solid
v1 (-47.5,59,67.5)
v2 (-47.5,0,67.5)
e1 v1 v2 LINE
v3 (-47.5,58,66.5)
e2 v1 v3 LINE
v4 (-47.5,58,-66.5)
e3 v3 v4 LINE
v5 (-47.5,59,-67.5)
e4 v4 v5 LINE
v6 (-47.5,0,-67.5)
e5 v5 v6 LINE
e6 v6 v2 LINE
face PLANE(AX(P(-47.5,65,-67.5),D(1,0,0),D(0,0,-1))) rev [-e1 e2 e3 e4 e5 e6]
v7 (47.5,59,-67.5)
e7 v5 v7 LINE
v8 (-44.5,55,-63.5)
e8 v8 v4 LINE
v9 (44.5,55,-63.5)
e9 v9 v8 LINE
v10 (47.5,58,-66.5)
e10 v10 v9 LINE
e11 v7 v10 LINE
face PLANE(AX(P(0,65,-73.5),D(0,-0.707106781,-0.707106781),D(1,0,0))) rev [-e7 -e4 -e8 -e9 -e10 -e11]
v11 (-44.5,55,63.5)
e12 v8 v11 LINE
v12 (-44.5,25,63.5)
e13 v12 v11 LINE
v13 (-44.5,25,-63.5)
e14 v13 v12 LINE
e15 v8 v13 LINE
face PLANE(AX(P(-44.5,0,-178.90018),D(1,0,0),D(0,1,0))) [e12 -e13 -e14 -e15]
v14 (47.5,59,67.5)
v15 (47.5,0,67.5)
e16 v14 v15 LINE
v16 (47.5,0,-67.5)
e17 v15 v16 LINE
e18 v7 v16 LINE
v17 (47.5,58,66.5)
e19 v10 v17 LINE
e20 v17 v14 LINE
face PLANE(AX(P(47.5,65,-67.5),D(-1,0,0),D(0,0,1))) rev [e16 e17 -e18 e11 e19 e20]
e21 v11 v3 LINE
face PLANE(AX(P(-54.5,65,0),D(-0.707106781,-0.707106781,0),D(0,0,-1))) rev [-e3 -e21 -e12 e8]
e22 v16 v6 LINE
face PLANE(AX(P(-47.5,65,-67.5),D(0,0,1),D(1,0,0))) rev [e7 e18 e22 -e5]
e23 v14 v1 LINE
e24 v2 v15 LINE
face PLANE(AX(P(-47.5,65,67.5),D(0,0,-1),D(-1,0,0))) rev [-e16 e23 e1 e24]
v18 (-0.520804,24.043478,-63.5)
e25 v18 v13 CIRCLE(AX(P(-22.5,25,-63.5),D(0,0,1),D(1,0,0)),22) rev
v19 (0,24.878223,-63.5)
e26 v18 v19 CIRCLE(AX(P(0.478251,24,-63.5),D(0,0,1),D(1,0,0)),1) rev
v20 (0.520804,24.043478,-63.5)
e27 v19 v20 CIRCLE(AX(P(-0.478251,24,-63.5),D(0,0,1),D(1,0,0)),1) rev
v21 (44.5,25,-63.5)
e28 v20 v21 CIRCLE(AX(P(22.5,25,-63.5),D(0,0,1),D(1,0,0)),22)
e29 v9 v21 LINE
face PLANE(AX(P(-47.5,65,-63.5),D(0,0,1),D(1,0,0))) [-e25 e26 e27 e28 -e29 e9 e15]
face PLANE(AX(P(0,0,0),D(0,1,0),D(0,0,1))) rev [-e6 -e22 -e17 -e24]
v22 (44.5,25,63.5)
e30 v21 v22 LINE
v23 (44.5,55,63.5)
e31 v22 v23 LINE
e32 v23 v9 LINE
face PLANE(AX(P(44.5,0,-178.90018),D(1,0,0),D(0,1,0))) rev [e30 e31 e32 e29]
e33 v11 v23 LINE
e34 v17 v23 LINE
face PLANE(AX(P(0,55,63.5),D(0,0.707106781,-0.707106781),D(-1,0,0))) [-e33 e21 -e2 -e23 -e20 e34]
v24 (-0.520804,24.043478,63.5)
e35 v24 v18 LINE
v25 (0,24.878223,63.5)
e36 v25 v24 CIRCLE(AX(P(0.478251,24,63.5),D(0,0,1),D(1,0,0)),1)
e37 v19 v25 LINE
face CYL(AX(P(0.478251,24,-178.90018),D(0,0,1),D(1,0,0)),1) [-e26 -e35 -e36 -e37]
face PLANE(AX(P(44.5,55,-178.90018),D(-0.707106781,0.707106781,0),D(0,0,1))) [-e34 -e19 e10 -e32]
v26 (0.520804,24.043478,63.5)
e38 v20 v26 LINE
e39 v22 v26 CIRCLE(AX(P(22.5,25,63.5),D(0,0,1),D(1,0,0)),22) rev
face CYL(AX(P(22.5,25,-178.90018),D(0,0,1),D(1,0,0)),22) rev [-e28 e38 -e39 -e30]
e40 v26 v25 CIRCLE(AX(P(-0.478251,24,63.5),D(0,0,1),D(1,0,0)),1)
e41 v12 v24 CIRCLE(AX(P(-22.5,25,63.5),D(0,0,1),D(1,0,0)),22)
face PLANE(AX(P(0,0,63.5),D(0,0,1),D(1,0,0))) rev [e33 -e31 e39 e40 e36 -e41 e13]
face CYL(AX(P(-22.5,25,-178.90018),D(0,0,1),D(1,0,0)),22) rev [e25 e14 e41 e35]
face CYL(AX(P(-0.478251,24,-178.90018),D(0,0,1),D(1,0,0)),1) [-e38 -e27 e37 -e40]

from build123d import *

# Parameters (mm, degrees)
SKETCH1_W           = 95
SKETCH1_H           = 135
BOSS_EXTRUDE1_DEPTH = 65
CUT_EXTRUDE1_DEPTH  = 127
FILLET1_R           = 1


with BuildPart() as part:
    # Sketch1 → Boss-Extrude1 (new body)
    with BuildSketch(Plane(origin=(0, 0, 0), x_dir=(1, 0, 0), z_dir=(0, 1, 0))):
        Rectangle(SKETCH1_W, SKETCH1_H)
    extrude(amount=BOSS_EXTRUDE1_DEPTH)

    # Sketch2 → Cut-Extrude1 (cut)
    with BuildSketch(Plane.XY.offset(63.5)):
        with BuildLine():
            Line((-44.5, 25), (-44.5, 70))
            Line((-44.5, 70), (44.5, 70))
            Line((44.5, 70), (44.5, 25))
            ThreePointArc((44.5, 25), (22.5, 3), (0.5, 25))
            Line((0.5, 25), (-0.5, 25))
            ThreePointArc((-0.5, 25), (-22.5, 3), (-44.5, 25))
        make_face()
    extrude(amount=-CUT_EXTRUDE1_DEPTH, mode=Mode.SUBTRACT)

    # Fillet1
    # the kernel refuses this fillet: 1 mm, written as the material it takes off along each edge
    with BuildSketch(Plane(origin=(0.5, 25, 63.5), x_dir=(-1, 0, 0), z_dir=(0, 0, -1))) as fillet1_piece_1:
        with BuildLine():
            CenterArc((0.978250586, -1), FILLET1_R, 90, 87.508093631)
            ThreePointArc((-0.020803787, -0.956521739), (-0.005201562, -0.478373974), (0, 0))
            Line((0, 0), (0.978250586, 0))
        make_face()
    extrude(amount=127, mode=Mode.SUBTRACT)
    with BuildSketch(Plane(origin=(-0.5, 25, 63.5), x_dir=(-0.02174427153342351, -0.9997635653770749, 0), z_dir=(0, 0, -1))) as fillet1_piece_2:
        with BuildLine():
            CenterArc((0.978492219, -0.999763565), FILLET1_R, 91.245953184, 87.508093631)
            Line((-0.021271346, -0.978019294), (0, 0))
            ThreePointArc((0, 0), (0.478373974, -0.005201562), (0.956747947, 0))
        make_face()
    extrude(amount=127, mode=Mode.SUBTRACT)

    # Chamfer1
    # the kernel refuses this chamfer: 10 mm, written as the material it takes off along each edge
    with BuildSketch(Plane(origin=(-44.5, 65, 63.5), x_dir=(0, 0.027495876610586317, 0.9996219169112968), z_dir=(1, 0, 0))) as chamfer1_piece_1:
        with BuildLine():
            Line((10.286731952, 0), (-0.565471549, 10.271177935))
            Line((-0.565471549, 10.271177935), (-0.765395932, 10.26567876))
            ThreePointArc((-0.765395932, 10.26567876), (-0.341292271, 5.133978296), (-0.199924383, -0.005499175))
            Line((-0.199924383, -0.005499175), (0.005499175, -0.199924383))
            ThreePointArc((0.005499175, -0.199924383), (5.144976647, -0.058556496), (10.292231127, -0.199924383))
            Line((10.292231127, -0.199924383), (10.286731952, 0))
        make_face()
    extrude(amount=89, mode=Mode.SUBTRACT)
    with BuildSketch(Plane(origin=(44.5, 65, 63.5), x_dir=(0.9996219169112968, 0.027495876610586317, 0), z_dir=(0, 0, -1)), Plane(origin=(-44.5, 65, -63.5), x_dir=(-0.9996219169112968, 0.027495876610586317, 0), z_dir=(0, 0, 1))) as chamfer1_piece_2:
        with BuildLine():
            Line((10.286731952, 0), (-0.565471549, 10.271177935))
            Line((-0.565471549, 10.271177935), (-0.765395932, 10.26567876))
            ThreePointArc((-0.765395932, 10.26567876), (-0.341292271, 5.133978296), (-0.199924383, -0.005499175))
            Line((-0.199924383, -0.005499175), (0.005499175, -0.199924383))
            ThreePointArc((0.005499175, -0.199924383), (5.144976647, -0.058556496), (10.292231127, -0.199924383))
            Line((10.292231127, -0.199924383), (10.286731952, 0))
        make_face()
    extrude(amount=127, mode=Mode.SUBTRACT)
    with BuildSketch(Plane(origin=(-44.5, 65, -63.5), x_dir=(0, 0.027495876610586317, -0.9996219169112968), z_dir=(1, 0, 0))) as chamfer1_piece_3:
        with BuildLine():
            Line((10.286731952, 0), (-0.565471549, -10.271177935))
            Line((-0.565471549, -10.271177935), (-0.765395932, -10.26567876))
            ThreePointArc((-0.765395932, -10.26567876), (-0.341292271, -5.133978296), (-0.199924383, 0.005499175))
            Line((-0.199924383, 0.005499175), (0.005499175, 0.199924383))
            ThreePointArc((0.005499175, 0.199924383), (5.144976647, 0.058556496), (10.292231127, 0.199924383))
            Line((10.292231127, 0.199924383), (10.286731952, 0))
        make_face()
    extrude(amount=89, mode=Mode.SUBTRACT)
    with BuildSketch(Plane(origin=(-70.21682988, 65, 63.5), x_dir=(0, 0.027495876610586317, 0.9996219169112968), z_dir=(1, 0, 0))) as chamfer1_piece_4a_section:
        with BuildLine():
            Line((10.286731952, 0), (-0.565471549, 10.271177935))
            Line((-0.565471549, 10.271177935), (-0.765395932, 10.26567876))
            ThreePointArc((-0.765395932, 10.26567876), (-0.341292271, 5.133978296), (-0.199924383, -0.005499175))
            Line((-0.199924383, -0.005499175), (0.005499175, -0.199924383))
            ThreePointArc((0.005499175, -0.199924383), (5.144976647, -0.058556496), (10.292231127, -0.199924383))
            Line((10.292231127, -0.199924383), (10.286731952, 0))
        make_face()
    chamfer1_piece_4a = extrude(amount=114.71682988, mode=Mode.PRIVATE)
    chamfer1_piece_4a = split(chamfer1_piece_4a, bisect_by=Plane(origin=(-44.5, 61.702063732, 66.797936268), z_dir=(-1, 0, 0)), keep=Keep.TOP, mode=Mode.PRIVATE)
    with BuildSketch(Plane(origin=(-44.5, 65, -63.5), x_dir=(-0.9996219169112968, 0.027495876610586317, 0), z_dir=(0, 0, 1))) as chamfer1_piece_4b_section:
        with BuildLine():
            Line((10.286731952, 0), (-0.565471549, 10.271177935))
            Line((-0.565471549, 10.271177935), (-0.765395932, 10.26567876))
            ThreePointArc((-0.765395932, 10.26567876), (-0.341292271, 5.133978296), (-0.199924383, -0.005499175))
            Line((-0.199924383, -0.005499175), (0.005499175, -0.199924383))
            ThreePointArc((0.005499175, -0.199924383), (5.144976647, -0.058556496), (10.292231127, -0.199924383))
            Line((10.292231127, -0.199924383), (10.286731952, 0))
        make_face()
    chamfer1_piece_4b = extrude(amount=152.71682988, mode=Mode.PRIVATE)
    chamfer1_piece_4b = split(chamfer1_piece_4b, bisect_by=Plane(origin=(-47.797936268, 61.702063732, 63.5), z_dir=(0, 0, 1)), keep=Keep.TOP, mode=Mode.PRIVATE)
    chamfer1_piece_4 = chamfer1_piece_4a & chamfer1_piece_4b
    add(chamfer1_piece_4, mode=Mode.SUBTRACT)
    with BuildSketch(Plane(origin=(44.5, 65, 89.21682988), x_dir=(0.9996219169112968, 0.027495876610586317, 0), z_dir=(0, 0, -1))) as chamfer1_piece_5a_section:
        with BuildLine():
            Line((10.286731952, 0), (-0.565471549, 10.271177935))
            Line((-0.565471549, 10.271177935), (-0.765395932, 10.26567876))
            ThreePointArc((-0.765395932, 10.26567876), (-0.341292271, 5.133978296), (-0.199924383, -0.005499175))
            Line((-0.199924383, -0.005499175), (0.005499175, -0.199924383))
            ThreePointArc((0.005499175, -0.199924383), (5.144976647, -0.058556496), (10.292231127, -0.199924383))
            Line((10.292231127, -0.199924383), (10.286731952, 0))
        make_face()
    chamfer1_piece_5a = extrude(amount=152.71682988, mode=Mode.PRIVATE)
    chamfer1_piece_5a = split(chamfer1_piece_5a, bisect_by=Plane(origin=(47.797936268, 61.702063732, 63.5), z_dir=(0, 0, 1)), keep=Keep.TOP, mode=Mode.PRIVATE)
    with BuildSketch(Plane(origin=(-44.5, 65, 63.5), x_dir=(0, 0.027495876610586317, 0.9996219169112968), z_dir=(1, 0, 0))) as chamfer1_piece_5b_section:
        with BuildLine():
            Line((10.286731952, 0), (-0.565471549, 10.271177935))
            Line((-0.565471549, 10.271177935), (-0.765395932, 10.26567876))
            ThreePointArc((-0.765395932, 10.26567876), (-0.341292271, 5.133978296), (-0.199924383, -0.005499175))
            Line((-0.199924383, -0.005499175), (0.005499175, -0.199924383))
            ThreePointArc((0.005499175, -0.199924383), (5.144976647, -0.058556496), (10.292231127, -0.199924383))
            Line((10.292231127, -0.199924383), (10.286731952, 0))
        make_face()
    chamfer1_piece_5b = extrude(amount=114.71682988, mode=Mode.PRIVATE)
    chamfer1_piece_5b = split(chamfer1_piece_5b, bisect_by=Plane(origin=(44.5, 61.702063732, 66.797936268), z_dir=(1, 0, 0)), keep=Keep.TOP, mode=Mode.PRIVATE)
    chamfer1_piece_5 = chamfer1_piece_5a & chamfer1_piece_5b
    add(chamfer1_piece_5, mode=Mode.SUBTRACT)
    with BuildSketch(Plane(origin=(-44.5, 65, -63.5), x_dir=(0, 0.027495876610586317, -0.9996219169112968), z_dir=(1, 0, 0))) as chamfer1_piece_6a_section:
        with BuildLine():
            Line((10.286731952, 0), (-0.565471549, -10.271177935))
            Line((-0.565471549, -10.271177935), (-0.765395932, -10.26567876))
            ThreePointArc((-0.765395932, -10.26567876), (-0.341292271, -5.133978296), (-0.199924383, 0.005499175))
            Line((-0.199924383, 0.005499175), (0.005499175, 0.199924383))
            ThreePointArc((0.005499175, 0.199924383), (5.144976647, 0.058556496), (10.292231127, 0.199924383))
            Line((10.292231127, 0.199924383), (10.286731952, 0))
        make_face()
    chamfer1_piece_6a = extrude(amount=114.71682988, mode=Mode.PRIVATE)
    chamfer1_piece_6a = split(chamfer1_piece_6a, bisect_by=Plane(origin=(44.5, 61.702063732, -66.797936268), z_dir=(1, 0, 0)), keep=Keep.TOP, mode=Mode.PRIVATE)
    with BuildSketch(Plane(origin=(44.5, 65, 63.5), x_dir=(0.9996219169112968, 0.027495876610586317, 0), z_dir=(0, 0, -1))) as chamfer1_piece_6b_section:
        with BuildLine():
            Line((10.286731952, 0), (-0.565471549, 10.271177935))
            Line((-0.565471549, 10.271177935), (-0.765395932, 10.26567876))
            ThreePointArc((-0.765395932, 10.26567876), (-0.341292271, 5.133978296), (-0.199924383, -0.005499175))
            Line((-0.199924383, -0.005499175), (0.005499175, -0.199924383))
            ThreePointArc((0.005499175, -0.199924383), (5.144976647, -0.058556496), (10.292231127, -0.199924383))
            Line((10.292231127, -0.199924383), (10.286731952, 0))
        make_face()
    chamfer1_piece_6b = extrude(amount=152.71682988, mode=Mode.PRIVATE)
    chamfer1_piece_6b = split(chamfer1_piece_6b, bisect_by=Plane(origin=(47.797936268, 61.702063732, -63.5), z_dir=(0, 0, -1)), keep=Keep.TOP, mode=Mode.PRIVATE)
    chamfer1_piece_6 = chamfer1_piece_6a & chamfer1_piece_6b
    add(chamfer1_piece_6, mode=Mode.SUBTRACT)
    with BuildSketch(Plane(origin=(-70.21682988, 65, -63.5), x_dir=(0, 0.027495876610586317, -0.9996219169112968), z_dir=(1, 0, 0))) as chamfer1_piece_7a_section:
        with BuildLine():
            Line((10.286731952, 0), (-0.565471549, -10.271177935))
            Line((-0.565471549, -10.271177935), (-0.765395932, -10.26567876))
            ThreePointArc((-0.765395932, -10.26567876), (-0.341292271, -5.133978296), (-0.199924383, 0.005499175))
            Line((-0.199924383, 0.005499175), (0.005499175, 0.199924383))
            ThreePointArc((0.005499175, 0.199924383), (5.144976647, 0.058556496), (10.292231127, 0.199924383))
            Line((10.292231127, 0.199924383), (10.286731952, 0))
        make_face()
    chamfer1_piece_7a = extrude(amount=114.71682988, mode=Mode.PRIVATE)
    chamfer1_piece_7a = split(chamfer1_piece_7a, bisect_by=Plane(origin=(-44.5, 61.702063732, -66.797936268), z_dir=(-1, 0, 0)), keep=Keep.TOP, mode=Mode.PRIVATE)
    with BuildSketch(Plane(origin=(-44.5, 65, -89.21682988), x_dir=(-0.9996219169112968, 0.027495876610586317, 0), z_dir=(0, 0, 1))) as chamfer1_piece_7b_section:
        with BuildLine():
            Line((10.286731952, 0), (-0.565471549, 10.271177935))
            Line((-0.565471549, 10.271177935), (-0.765395932, 10.26567876))
            ThreePointArc((-0.765395932, 10.26567876), (-0.341292271, 5.133978296), (-0.199924383, -0.005499175))
            Line((-0.199924383, -0.005499175), (0.005499175, -0.199924383))
            ThreePointArc((0.005499175, -0.199924383), (5.144976647, -0.058556496), (10.292231127, -0.199924383))
            Line((10.292231127, -0.199924383), (10.286731952, 0))
        make_face()
    chamfer1_piece_7b = extrude(amount=152.71682988, mode=Mode.PRIVATE)
    chamfer1_piece_7b = split(chamfer1_piece_7b, bisect_by=Plane(origin=(-47.797936268, 61.702063732, -63.5), z_dir=(0, 0, -1)), keep=Keep.TOP, mode=Mode.PRIVATE)
    chamfer1_piece_7 = chamfer1_piece_7a & chamfer1_piece_7b
    add(chamfer1_piece_7, mode=Mode.SUBTRACT)


solid = part.part
